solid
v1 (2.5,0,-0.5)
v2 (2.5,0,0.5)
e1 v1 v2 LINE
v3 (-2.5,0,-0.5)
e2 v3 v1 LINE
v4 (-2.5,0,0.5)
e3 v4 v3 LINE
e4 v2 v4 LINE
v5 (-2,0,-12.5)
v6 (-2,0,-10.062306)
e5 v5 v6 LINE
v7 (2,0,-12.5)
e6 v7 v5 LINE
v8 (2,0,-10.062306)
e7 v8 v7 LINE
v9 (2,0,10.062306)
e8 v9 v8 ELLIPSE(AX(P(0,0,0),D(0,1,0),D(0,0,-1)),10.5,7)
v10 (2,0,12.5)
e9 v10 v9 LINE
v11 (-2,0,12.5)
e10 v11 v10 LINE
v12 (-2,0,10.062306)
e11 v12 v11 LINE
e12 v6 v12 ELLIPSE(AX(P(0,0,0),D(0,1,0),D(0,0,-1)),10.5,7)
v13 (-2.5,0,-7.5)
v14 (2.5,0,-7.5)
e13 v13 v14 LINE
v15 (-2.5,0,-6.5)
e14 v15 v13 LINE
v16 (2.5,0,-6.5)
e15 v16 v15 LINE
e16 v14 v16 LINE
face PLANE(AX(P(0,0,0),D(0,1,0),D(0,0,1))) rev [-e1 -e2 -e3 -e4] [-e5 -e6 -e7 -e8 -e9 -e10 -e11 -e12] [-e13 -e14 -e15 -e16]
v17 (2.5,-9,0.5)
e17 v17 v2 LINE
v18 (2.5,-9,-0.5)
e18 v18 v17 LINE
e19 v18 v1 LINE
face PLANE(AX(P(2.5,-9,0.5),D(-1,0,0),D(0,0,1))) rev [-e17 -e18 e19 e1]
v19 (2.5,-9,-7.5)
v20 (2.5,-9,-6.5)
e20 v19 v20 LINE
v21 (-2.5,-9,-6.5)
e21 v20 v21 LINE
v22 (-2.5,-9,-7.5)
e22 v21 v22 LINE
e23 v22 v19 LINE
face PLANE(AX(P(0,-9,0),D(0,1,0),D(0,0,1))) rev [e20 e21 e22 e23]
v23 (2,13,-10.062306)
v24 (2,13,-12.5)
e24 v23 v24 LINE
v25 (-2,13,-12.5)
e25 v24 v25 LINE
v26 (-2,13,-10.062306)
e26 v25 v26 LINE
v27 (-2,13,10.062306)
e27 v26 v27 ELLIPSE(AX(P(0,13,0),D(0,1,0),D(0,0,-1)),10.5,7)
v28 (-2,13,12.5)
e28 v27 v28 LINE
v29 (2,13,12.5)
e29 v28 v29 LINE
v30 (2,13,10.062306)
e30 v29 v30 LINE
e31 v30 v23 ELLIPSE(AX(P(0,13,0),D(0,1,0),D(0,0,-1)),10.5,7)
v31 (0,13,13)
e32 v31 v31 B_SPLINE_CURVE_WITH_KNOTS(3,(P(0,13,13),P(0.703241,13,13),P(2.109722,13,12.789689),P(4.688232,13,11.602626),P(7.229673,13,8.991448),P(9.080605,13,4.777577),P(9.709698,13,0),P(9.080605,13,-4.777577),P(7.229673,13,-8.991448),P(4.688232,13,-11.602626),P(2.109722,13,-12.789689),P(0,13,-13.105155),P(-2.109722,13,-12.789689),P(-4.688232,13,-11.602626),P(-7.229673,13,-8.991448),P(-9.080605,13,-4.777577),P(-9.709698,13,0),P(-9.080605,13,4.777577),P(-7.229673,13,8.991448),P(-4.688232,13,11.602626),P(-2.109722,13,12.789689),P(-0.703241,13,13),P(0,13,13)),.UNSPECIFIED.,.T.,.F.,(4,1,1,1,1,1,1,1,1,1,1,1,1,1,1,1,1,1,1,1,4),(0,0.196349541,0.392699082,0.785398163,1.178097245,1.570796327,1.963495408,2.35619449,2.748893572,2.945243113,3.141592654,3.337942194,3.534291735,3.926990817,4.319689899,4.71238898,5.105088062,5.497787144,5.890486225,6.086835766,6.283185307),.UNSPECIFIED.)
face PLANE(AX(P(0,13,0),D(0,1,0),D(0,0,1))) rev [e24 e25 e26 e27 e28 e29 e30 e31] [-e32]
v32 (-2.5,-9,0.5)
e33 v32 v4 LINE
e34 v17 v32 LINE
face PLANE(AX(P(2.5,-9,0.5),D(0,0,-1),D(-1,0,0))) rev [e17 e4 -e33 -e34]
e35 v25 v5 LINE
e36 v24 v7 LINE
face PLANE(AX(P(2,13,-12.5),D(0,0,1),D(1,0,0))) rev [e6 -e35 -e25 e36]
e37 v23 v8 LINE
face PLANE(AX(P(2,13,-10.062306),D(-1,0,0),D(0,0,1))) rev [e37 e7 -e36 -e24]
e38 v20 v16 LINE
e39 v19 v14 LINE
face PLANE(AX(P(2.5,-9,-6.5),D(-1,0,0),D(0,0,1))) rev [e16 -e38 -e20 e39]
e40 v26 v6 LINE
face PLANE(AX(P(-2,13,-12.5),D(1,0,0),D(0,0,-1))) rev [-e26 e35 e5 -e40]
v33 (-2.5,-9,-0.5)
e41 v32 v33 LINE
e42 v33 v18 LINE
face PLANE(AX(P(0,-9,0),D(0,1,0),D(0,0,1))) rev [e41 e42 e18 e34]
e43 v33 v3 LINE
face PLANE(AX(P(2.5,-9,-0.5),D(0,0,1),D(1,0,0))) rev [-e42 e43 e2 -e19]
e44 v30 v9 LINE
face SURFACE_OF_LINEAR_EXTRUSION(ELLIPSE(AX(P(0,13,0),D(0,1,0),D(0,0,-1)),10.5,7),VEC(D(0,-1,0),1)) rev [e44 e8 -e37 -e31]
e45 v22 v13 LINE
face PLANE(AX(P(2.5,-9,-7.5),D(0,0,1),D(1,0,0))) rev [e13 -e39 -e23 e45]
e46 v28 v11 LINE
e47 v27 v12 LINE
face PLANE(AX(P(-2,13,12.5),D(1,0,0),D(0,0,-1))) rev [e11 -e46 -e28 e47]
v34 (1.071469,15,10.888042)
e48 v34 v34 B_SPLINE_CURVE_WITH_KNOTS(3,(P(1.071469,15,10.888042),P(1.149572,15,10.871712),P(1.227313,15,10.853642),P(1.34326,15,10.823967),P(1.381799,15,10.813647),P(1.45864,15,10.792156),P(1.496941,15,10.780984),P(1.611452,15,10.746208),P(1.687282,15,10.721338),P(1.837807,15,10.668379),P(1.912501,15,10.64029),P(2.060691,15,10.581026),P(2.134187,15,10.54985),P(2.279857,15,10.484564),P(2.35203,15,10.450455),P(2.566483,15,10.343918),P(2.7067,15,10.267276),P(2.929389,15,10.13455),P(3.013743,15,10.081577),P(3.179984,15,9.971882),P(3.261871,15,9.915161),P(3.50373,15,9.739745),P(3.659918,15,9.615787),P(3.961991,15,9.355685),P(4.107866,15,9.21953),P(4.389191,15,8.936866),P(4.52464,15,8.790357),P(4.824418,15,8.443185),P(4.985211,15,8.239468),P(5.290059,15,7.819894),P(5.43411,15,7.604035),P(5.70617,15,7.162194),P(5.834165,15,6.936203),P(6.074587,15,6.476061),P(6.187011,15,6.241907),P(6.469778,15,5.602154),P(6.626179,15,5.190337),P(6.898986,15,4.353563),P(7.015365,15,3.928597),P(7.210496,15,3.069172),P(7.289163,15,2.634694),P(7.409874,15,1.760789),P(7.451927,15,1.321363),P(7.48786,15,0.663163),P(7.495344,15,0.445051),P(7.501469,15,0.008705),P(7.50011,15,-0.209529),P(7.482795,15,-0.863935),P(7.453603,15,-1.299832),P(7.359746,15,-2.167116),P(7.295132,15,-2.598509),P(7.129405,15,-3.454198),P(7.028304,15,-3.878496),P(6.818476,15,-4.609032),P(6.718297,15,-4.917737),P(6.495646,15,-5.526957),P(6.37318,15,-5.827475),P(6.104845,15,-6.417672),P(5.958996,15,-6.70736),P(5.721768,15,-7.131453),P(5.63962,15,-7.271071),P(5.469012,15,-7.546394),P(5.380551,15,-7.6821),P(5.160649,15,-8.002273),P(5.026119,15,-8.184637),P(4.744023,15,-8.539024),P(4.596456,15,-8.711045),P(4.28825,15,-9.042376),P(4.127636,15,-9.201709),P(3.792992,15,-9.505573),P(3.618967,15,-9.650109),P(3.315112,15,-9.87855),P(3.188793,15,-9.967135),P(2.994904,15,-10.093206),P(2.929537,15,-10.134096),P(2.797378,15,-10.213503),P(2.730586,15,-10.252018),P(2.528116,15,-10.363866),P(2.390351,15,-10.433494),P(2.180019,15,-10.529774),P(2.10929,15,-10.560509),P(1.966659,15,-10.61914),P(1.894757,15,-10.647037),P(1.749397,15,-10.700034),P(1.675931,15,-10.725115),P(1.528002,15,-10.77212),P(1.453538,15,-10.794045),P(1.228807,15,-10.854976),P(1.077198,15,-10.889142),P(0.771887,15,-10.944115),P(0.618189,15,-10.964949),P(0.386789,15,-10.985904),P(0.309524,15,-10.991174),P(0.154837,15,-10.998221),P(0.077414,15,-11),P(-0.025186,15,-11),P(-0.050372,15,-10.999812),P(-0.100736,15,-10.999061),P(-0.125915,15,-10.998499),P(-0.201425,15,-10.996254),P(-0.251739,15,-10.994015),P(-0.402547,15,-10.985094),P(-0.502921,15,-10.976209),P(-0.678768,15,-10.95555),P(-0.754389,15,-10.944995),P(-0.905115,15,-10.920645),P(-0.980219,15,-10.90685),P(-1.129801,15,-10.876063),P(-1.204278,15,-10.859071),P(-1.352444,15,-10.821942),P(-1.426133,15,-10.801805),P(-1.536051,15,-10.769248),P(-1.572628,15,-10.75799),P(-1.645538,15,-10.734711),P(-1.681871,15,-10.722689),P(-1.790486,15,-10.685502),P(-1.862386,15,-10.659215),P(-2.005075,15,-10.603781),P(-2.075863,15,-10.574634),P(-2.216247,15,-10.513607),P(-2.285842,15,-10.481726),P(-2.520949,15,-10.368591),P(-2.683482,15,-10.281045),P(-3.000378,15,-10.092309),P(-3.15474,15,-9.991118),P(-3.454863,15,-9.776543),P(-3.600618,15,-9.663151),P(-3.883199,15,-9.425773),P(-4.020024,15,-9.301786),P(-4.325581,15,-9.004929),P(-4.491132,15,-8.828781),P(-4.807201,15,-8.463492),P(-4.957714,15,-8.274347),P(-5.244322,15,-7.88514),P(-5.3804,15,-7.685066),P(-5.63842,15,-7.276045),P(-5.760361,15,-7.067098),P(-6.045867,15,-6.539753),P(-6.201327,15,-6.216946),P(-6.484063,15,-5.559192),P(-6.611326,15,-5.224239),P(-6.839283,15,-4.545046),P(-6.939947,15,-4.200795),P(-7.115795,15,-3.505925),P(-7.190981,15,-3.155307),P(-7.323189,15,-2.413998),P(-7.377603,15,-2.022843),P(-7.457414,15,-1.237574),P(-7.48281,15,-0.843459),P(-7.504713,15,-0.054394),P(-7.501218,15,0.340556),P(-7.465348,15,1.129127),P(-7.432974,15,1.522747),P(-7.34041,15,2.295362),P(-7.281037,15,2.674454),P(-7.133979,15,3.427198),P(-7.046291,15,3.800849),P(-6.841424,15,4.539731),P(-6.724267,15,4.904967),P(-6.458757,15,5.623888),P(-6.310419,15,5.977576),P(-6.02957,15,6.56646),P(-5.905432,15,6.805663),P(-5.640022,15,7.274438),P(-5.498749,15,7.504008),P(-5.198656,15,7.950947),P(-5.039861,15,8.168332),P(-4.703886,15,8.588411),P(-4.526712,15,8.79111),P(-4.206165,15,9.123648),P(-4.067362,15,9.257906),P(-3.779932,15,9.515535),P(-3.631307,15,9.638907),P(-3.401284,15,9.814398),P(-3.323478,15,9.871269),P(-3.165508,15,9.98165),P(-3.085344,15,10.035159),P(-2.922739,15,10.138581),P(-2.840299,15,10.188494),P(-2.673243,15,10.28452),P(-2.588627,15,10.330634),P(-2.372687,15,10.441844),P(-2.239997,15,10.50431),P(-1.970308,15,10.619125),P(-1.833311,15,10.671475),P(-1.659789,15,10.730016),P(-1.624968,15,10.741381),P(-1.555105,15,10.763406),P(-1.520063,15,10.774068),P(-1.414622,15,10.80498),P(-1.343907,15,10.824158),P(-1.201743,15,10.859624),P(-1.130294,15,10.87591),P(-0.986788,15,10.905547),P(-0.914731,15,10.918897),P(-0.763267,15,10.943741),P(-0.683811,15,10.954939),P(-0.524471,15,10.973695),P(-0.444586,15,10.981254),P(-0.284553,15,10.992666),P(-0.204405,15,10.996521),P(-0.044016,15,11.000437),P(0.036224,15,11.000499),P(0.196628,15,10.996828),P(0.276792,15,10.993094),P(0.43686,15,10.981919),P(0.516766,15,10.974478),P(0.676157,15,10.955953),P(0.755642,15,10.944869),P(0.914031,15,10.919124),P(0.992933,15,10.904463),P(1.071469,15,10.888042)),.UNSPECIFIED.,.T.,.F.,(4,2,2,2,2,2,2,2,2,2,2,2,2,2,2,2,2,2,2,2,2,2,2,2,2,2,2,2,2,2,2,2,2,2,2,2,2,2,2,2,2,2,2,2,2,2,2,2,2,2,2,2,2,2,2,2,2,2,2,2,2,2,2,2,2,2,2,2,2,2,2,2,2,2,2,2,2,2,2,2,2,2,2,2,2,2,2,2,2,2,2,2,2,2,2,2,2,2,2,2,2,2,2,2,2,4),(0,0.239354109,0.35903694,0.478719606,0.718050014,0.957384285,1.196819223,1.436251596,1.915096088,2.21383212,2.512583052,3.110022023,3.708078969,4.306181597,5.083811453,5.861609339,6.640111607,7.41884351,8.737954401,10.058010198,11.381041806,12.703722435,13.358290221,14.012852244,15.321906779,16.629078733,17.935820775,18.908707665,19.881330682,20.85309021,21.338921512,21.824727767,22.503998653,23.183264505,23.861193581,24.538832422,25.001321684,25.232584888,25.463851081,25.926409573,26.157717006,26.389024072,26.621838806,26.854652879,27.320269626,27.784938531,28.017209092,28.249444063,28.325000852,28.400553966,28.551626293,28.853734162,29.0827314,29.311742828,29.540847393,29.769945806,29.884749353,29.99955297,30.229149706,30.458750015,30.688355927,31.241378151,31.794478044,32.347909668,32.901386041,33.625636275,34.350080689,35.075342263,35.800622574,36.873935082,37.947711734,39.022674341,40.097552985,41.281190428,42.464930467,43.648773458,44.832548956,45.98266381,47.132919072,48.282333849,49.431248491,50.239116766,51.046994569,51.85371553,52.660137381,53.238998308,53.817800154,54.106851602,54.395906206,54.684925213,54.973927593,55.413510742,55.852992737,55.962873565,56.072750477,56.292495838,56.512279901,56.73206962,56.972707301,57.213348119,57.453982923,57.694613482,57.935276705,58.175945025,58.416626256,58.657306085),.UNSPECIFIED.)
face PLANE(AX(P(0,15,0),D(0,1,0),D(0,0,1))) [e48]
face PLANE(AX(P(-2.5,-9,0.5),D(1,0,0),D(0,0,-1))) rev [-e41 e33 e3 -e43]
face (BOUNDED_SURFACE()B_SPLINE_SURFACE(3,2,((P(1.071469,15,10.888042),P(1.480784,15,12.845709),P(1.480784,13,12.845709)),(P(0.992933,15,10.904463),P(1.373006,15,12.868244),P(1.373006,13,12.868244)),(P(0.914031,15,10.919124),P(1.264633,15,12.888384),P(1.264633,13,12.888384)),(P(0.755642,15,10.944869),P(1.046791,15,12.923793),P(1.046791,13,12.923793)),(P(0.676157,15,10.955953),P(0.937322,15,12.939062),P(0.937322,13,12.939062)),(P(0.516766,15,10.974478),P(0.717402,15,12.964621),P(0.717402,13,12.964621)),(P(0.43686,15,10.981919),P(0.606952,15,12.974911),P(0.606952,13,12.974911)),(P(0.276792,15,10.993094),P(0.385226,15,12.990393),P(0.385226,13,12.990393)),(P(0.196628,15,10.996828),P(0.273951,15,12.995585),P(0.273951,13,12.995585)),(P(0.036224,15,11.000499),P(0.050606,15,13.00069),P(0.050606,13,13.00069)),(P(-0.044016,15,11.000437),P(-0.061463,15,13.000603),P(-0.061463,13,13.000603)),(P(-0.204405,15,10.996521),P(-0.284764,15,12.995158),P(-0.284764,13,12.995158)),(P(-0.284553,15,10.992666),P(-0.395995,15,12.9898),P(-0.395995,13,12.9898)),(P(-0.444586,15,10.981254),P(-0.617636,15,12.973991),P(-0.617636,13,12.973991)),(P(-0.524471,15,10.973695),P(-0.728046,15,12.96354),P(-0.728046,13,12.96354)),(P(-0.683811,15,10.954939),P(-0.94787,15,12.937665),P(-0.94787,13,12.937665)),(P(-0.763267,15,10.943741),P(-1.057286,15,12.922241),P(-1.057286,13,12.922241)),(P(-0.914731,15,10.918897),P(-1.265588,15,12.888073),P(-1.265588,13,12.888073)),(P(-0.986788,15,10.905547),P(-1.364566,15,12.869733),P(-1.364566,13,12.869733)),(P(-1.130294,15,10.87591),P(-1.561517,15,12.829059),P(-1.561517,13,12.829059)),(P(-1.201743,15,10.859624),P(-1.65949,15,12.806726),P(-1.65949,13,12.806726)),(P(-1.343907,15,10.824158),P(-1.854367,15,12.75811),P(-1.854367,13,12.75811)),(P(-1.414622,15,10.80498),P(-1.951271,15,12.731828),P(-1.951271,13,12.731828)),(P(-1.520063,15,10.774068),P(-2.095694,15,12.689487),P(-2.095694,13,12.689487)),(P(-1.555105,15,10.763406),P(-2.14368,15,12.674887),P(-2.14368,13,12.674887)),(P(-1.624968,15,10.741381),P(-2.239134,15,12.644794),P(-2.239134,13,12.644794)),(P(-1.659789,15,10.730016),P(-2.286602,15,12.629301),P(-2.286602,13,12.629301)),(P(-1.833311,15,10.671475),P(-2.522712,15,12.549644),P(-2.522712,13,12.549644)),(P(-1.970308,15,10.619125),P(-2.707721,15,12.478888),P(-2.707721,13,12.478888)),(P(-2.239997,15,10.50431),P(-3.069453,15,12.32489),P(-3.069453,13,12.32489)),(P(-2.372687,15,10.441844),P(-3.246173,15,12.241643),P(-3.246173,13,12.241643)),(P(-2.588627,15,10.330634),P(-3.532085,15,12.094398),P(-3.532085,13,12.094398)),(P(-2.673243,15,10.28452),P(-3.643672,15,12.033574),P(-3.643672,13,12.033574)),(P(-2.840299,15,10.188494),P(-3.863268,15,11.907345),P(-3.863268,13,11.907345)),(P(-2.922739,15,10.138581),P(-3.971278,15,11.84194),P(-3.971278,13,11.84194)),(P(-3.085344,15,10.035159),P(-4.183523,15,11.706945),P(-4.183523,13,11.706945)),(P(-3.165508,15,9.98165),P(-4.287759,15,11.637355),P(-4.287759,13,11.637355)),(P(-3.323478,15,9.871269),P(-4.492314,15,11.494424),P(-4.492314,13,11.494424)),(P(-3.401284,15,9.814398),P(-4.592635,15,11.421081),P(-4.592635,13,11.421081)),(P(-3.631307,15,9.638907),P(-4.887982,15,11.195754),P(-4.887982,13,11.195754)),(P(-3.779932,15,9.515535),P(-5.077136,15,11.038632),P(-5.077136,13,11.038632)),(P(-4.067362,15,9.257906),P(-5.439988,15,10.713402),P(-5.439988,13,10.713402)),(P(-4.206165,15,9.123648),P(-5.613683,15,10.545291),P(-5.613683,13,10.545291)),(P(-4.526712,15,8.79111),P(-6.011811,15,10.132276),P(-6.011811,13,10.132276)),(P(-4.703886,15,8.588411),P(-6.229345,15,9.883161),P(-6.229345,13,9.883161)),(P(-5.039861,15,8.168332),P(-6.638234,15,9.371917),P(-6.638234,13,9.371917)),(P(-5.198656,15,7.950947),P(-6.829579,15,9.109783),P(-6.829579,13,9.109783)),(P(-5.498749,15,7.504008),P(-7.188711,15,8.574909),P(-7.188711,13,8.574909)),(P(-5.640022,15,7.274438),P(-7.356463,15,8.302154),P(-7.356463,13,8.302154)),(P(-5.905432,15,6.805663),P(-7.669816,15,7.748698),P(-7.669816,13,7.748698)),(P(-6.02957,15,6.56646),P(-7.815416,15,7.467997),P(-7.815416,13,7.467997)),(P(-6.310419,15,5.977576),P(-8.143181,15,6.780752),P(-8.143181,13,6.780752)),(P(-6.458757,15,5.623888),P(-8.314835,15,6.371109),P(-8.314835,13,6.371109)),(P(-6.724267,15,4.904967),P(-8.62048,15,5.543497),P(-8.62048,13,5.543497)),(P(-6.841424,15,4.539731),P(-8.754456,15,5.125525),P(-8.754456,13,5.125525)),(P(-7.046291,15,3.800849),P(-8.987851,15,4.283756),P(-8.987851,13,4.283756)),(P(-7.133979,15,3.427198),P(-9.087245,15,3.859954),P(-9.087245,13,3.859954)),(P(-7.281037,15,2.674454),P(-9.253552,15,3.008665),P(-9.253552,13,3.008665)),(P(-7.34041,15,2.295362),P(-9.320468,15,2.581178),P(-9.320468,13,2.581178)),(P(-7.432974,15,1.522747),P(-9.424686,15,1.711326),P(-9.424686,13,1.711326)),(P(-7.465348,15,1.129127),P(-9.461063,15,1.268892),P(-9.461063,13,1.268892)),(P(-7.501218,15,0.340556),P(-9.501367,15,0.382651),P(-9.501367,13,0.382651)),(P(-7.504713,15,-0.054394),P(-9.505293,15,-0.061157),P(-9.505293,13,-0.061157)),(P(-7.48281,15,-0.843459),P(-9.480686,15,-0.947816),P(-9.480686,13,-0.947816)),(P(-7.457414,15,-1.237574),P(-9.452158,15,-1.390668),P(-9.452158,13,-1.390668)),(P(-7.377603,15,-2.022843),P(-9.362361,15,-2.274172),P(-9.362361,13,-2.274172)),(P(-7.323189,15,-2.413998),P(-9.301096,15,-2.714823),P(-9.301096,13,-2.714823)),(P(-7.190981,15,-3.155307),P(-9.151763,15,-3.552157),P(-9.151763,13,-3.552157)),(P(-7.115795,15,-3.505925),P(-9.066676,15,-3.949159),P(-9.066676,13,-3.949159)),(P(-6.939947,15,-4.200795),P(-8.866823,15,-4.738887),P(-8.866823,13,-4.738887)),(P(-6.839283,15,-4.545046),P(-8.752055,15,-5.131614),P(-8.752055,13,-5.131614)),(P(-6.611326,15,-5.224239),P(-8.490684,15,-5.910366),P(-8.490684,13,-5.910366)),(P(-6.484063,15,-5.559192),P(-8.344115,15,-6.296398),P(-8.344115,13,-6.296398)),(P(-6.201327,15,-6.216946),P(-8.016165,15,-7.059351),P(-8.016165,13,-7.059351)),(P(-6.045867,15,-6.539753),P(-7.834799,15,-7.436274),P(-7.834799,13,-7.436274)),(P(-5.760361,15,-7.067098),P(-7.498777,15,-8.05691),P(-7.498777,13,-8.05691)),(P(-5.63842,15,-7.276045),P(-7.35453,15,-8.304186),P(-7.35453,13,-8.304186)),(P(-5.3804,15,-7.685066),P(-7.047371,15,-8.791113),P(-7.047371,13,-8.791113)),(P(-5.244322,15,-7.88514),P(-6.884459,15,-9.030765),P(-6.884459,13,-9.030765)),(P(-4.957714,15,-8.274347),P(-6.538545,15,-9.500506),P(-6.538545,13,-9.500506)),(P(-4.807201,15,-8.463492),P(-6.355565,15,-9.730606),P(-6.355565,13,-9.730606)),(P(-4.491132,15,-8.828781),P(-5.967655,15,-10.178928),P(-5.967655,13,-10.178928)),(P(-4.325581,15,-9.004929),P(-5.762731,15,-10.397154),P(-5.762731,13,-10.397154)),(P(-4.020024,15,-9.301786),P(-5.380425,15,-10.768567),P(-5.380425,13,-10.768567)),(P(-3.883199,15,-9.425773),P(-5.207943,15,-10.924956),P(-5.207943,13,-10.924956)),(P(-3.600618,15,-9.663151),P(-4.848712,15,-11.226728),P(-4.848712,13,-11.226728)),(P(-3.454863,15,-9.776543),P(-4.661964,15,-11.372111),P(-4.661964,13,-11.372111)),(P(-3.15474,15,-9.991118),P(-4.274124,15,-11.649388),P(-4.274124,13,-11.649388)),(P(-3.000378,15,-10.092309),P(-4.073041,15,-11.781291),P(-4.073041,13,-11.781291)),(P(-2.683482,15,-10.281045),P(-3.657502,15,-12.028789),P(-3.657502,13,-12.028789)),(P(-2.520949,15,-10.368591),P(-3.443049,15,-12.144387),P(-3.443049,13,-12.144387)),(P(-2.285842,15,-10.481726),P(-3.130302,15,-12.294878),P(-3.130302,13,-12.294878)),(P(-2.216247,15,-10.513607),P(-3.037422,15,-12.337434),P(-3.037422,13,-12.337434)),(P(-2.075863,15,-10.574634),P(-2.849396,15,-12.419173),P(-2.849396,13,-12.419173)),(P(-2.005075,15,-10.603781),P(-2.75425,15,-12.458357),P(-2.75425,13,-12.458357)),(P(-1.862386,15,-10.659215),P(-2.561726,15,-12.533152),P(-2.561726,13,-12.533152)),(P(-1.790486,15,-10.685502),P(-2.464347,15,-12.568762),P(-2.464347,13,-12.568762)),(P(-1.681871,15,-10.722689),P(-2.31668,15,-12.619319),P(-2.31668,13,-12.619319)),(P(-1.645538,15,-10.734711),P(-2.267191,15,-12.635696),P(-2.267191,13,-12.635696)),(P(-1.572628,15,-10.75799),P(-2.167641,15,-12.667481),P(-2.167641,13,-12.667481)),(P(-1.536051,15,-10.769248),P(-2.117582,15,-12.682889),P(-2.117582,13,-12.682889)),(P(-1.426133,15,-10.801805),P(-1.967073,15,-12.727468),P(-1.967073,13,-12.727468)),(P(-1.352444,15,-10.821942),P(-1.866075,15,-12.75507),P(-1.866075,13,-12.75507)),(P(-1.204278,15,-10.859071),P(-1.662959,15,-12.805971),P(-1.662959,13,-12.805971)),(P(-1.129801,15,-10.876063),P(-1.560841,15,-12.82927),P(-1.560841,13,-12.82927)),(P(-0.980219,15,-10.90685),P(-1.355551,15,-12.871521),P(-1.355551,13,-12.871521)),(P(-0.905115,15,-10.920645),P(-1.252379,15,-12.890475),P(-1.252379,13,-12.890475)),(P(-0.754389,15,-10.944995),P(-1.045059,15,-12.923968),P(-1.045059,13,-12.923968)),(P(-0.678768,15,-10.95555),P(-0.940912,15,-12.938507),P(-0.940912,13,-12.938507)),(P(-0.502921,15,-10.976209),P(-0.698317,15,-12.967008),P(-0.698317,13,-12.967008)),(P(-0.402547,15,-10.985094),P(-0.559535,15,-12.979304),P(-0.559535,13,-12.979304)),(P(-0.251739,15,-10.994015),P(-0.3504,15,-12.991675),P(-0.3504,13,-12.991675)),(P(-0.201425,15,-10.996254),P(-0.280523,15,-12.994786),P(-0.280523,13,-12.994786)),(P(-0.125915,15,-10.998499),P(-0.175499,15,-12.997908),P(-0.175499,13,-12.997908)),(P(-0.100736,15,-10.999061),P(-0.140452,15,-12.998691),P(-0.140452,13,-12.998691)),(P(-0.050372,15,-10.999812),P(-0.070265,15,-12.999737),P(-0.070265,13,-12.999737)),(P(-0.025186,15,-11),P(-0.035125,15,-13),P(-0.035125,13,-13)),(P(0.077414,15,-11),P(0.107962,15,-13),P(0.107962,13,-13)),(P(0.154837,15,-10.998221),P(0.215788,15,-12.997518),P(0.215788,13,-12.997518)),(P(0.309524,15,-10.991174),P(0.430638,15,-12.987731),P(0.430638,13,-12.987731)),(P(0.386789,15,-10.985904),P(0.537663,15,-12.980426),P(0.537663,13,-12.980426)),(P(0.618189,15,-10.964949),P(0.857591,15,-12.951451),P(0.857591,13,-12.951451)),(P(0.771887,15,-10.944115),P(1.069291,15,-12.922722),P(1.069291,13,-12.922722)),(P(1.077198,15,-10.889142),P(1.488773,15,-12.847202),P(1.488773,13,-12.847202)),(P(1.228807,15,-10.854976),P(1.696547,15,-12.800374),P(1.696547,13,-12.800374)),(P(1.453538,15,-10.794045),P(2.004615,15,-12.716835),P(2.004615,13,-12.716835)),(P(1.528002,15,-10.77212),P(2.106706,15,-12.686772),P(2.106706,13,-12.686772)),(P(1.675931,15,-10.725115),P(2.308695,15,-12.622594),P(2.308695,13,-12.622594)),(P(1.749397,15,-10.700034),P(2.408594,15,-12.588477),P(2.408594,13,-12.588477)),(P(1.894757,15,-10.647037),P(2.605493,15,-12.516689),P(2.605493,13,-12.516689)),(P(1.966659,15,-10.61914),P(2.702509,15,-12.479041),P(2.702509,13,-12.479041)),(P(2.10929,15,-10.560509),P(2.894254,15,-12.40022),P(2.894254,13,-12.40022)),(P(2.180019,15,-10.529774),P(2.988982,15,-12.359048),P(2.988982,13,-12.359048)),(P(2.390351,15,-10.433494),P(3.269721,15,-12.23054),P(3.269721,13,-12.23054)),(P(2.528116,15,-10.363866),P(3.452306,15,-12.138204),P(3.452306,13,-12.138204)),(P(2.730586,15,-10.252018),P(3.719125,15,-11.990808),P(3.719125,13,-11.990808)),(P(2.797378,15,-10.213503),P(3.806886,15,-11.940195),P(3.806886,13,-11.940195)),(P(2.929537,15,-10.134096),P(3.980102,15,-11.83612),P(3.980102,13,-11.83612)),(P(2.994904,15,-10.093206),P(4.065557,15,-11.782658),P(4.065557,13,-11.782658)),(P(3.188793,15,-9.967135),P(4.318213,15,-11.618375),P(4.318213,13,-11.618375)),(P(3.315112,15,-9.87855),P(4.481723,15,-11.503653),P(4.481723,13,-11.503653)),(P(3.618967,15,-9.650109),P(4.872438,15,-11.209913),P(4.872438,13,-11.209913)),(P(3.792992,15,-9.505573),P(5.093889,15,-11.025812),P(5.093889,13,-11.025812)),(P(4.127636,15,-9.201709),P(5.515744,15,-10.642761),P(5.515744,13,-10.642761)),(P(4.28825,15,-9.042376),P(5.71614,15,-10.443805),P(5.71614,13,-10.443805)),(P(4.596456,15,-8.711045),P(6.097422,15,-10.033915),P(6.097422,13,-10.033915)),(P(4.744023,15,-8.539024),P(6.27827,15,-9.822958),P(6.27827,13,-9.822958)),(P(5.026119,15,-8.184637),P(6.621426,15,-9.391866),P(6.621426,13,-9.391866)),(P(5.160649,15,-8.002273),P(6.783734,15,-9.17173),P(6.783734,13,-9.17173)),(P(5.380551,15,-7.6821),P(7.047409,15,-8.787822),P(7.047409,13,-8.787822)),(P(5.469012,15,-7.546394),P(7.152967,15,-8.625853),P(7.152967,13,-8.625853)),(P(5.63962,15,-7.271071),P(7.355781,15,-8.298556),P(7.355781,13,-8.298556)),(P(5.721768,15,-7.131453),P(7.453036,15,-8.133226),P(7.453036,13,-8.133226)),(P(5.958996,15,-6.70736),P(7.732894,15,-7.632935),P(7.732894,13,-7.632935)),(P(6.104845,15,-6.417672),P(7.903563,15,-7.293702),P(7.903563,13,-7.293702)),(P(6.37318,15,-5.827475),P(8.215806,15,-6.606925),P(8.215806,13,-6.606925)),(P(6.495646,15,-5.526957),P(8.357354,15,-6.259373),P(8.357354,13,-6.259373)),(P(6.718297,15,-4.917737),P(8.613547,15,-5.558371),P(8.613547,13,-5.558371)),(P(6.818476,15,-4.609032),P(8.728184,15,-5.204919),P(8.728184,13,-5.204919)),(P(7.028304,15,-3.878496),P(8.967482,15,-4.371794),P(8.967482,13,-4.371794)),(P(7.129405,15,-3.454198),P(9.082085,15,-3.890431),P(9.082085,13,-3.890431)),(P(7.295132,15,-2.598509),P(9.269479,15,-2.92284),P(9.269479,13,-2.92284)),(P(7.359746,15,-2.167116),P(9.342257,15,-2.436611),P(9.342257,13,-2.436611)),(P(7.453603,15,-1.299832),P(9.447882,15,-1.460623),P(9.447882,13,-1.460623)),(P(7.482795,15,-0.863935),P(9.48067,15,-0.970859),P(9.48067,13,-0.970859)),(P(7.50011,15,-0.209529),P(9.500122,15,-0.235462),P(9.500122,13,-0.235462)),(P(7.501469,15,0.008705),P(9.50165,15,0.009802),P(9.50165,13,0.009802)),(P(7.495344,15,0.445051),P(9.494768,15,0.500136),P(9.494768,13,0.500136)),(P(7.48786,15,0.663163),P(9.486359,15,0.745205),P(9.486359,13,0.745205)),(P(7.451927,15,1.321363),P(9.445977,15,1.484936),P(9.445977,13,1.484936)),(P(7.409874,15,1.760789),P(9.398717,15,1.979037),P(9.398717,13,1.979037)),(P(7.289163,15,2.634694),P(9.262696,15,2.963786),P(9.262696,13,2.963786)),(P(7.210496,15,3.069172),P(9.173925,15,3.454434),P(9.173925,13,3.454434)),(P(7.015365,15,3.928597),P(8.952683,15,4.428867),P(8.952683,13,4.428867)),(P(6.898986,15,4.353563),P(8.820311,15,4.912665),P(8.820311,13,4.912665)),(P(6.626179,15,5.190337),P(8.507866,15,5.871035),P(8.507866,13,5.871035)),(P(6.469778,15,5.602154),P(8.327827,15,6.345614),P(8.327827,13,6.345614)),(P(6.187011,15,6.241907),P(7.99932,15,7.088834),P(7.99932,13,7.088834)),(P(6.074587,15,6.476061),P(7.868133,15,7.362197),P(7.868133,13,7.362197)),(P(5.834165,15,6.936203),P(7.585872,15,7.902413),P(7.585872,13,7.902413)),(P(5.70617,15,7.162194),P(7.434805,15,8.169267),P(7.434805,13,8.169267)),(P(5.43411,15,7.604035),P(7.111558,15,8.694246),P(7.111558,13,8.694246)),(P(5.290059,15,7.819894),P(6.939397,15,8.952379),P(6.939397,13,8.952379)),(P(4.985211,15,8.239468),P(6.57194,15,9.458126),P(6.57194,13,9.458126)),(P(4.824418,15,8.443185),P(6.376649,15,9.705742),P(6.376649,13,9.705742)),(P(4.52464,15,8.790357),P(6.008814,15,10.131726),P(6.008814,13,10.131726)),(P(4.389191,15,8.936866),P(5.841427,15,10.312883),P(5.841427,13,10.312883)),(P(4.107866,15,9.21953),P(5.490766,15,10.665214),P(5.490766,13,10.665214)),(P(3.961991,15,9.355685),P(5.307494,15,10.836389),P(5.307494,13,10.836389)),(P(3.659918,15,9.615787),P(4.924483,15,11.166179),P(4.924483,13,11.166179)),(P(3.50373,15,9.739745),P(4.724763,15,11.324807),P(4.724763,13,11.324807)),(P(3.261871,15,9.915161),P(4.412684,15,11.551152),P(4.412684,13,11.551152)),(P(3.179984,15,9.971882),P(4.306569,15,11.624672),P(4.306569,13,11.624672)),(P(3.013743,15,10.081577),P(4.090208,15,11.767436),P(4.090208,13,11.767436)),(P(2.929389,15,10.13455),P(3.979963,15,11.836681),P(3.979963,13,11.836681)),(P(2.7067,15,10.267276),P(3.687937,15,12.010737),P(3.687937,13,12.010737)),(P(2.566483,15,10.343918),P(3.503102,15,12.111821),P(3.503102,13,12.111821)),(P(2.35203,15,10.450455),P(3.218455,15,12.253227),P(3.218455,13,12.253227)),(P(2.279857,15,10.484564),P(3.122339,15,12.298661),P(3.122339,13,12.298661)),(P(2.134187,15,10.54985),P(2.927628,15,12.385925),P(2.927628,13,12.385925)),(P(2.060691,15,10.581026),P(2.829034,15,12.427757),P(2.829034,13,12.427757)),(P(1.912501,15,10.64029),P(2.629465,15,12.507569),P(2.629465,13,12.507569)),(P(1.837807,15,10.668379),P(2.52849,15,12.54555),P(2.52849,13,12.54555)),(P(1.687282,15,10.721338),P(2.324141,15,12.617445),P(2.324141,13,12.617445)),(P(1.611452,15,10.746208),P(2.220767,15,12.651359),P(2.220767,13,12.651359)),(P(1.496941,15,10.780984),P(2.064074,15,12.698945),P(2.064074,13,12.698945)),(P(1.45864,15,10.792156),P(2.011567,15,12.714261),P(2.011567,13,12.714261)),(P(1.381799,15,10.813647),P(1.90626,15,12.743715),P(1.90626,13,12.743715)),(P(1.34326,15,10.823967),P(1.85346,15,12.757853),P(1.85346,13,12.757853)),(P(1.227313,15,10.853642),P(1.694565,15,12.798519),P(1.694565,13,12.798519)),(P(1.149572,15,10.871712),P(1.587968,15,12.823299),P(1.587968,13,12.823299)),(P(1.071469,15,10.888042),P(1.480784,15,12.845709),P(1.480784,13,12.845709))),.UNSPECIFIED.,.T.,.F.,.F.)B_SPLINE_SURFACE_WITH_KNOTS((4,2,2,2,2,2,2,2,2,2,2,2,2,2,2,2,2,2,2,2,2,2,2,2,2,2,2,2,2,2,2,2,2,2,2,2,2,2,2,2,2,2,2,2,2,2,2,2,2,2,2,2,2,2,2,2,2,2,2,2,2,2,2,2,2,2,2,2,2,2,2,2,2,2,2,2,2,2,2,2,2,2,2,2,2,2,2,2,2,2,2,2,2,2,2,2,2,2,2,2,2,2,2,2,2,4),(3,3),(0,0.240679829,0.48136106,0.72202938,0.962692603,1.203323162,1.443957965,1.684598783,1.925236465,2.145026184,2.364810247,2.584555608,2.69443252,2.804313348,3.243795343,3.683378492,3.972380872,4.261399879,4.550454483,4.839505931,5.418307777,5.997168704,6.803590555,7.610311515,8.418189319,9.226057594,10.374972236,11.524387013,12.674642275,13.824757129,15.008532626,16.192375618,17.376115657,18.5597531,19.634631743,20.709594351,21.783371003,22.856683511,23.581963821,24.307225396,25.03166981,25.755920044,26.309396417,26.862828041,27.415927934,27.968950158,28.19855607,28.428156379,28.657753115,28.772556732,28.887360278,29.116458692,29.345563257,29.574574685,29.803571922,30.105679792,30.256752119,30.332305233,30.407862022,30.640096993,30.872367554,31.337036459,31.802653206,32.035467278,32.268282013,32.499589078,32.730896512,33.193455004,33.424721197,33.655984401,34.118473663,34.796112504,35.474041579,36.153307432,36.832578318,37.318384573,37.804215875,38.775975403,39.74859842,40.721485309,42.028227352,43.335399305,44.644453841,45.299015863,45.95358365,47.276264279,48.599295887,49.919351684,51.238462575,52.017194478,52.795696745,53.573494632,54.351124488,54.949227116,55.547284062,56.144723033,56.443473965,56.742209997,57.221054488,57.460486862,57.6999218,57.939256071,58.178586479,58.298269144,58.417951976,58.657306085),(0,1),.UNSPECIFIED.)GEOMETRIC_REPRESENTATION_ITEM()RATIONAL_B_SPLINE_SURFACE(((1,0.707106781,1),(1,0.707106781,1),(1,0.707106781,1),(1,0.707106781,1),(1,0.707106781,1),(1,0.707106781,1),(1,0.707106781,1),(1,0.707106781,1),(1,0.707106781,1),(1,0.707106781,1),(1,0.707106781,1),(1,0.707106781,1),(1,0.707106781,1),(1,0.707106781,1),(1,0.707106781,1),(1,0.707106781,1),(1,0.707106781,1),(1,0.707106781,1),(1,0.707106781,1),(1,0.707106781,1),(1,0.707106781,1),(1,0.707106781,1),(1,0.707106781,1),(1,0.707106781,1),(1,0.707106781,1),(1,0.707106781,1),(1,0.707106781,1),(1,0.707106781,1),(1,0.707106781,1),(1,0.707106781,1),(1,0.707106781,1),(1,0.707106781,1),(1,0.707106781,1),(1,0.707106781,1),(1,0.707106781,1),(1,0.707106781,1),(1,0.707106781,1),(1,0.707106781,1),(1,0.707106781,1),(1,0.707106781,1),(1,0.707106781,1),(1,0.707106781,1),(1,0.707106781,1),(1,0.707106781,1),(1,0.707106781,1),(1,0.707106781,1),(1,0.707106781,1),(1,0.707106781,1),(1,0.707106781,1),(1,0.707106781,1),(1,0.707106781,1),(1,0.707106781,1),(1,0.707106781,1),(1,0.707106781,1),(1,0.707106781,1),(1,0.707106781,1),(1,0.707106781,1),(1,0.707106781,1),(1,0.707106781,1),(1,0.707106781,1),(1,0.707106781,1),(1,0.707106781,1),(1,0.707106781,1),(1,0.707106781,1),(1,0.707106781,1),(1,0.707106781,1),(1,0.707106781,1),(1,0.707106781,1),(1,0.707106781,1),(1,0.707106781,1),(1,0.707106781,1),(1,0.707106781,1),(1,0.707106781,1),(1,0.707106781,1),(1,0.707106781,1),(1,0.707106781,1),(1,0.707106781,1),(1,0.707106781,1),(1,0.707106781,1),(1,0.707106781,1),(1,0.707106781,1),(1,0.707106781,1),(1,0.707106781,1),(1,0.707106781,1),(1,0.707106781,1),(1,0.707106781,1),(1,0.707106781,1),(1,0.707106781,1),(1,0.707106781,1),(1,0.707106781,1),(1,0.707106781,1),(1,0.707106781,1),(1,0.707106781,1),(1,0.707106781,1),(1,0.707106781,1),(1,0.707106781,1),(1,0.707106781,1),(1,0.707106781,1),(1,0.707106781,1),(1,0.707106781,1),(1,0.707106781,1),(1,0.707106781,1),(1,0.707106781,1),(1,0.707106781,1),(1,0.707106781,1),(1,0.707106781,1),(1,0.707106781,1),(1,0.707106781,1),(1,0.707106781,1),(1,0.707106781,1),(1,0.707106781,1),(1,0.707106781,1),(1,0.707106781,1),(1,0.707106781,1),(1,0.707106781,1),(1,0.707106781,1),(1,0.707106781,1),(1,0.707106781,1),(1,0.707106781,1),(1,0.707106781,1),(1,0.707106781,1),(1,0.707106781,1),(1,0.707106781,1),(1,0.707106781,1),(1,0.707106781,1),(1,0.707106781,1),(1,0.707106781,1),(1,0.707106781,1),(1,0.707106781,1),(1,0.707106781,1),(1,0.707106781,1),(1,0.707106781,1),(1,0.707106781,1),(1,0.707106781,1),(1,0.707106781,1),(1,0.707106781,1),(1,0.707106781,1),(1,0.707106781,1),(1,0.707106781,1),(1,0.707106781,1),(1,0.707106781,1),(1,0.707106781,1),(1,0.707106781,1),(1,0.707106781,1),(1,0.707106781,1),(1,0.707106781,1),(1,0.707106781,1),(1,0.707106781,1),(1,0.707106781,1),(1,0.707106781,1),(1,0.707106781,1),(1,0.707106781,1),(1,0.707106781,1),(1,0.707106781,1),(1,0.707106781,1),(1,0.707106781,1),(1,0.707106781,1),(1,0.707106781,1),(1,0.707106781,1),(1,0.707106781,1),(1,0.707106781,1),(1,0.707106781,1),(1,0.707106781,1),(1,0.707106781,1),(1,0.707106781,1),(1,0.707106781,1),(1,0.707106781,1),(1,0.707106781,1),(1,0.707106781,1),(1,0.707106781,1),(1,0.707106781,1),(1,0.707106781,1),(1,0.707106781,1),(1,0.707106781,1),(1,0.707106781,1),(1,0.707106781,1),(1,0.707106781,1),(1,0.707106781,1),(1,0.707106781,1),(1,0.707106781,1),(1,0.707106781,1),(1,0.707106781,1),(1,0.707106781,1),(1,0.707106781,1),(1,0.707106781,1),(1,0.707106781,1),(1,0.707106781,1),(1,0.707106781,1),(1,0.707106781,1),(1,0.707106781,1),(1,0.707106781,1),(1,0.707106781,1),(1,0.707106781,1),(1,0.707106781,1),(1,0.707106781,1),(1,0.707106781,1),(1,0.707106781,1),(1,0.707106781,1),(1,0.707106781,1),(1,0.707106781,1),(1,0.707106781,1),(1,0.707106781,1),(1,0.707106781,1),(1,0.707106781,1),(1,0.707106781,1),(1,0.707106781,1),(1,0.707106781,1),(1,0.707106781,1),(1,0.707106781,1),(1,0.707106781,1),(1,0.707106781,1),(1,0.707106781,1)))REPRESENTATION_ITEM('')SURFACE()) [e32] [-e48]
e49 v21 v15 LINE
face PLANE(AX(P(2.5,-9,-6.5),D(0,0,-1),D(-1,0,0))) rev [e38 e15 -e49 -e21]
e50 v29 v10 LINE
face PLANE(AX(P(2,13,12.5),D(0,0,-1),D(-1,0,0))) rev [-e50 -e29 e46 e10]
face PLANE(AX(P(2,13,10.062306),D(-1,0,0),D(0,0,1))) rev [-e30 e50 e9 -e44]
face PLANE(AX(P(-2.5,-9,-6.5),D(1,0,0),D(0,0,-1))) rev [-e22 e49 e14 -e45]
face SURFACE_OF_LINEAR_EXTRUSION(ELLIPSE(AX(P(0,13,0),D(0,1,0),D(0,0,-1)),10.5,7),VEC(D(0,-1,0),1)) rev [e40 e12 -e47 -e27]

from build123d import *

# Parameters (mm, degrees)
BOSS_EXTRU_1_DEPTH = 13
BOSS_EXTRU_2_DEPTH = 2
CONG_1_R           = 2
ESQUISSE3_W        = 5
ESQUISSE3_H        = 1
BOSS_EXTRU_3_DEPTH = 9


# Read off the part's stored shape, not the designer's step: Boss.-Extru.2
with BuildPart() as part:
    # Esquisse1 → Boss.-Extru.1 (new body)
    with BuildSketch(Plane(origin=(0, 0, 0), x_dir=(1, 0, 0), z_dir=(0, 1, 0))):
        with BuildLine():
            Line((2, 10.062305899), (2, 12.5))
            Line((2, 12.5), (-2, 12.5))
            Line((-2, 12.5), (-2, 10.062305899))
            add(Edge.make_bspline(
                [(-2, 10.062305899), (-24.5, 0), (-2, -10.062305899)],
                knots=[3.431344355, 3.431344355, 3.431344355, 5.993433606, 5.993433606, 5.993433606], degree=2, weights=[1, 0.285714286, 1]))
            Line((-2, -10.062305899), (-2, -12.5))
            Line((-2, -12.5), (2, -12.5))
            Line((2, -12.5), (2, -10.062305899))
            add(Edge.make_bspline(
                [(2, -10.062305899), (24.5, 0), (2, 10.062305899)],
                knots=[0.289751701, 0.289751701, 0.289751701, 2.851840952, 2.851840952, 2.851840952], degree=2, weights=[1, 0.285714286, 1]))
        make_face()
    extrude(amount=BOSS_EXTRU_1_DEPTH)

    # Boss.-Extru.2 outline → Boss.-Extru.2 (add)
    with BuildSketch(Plane(origin=(0, 13, 0), x_dir=(1, 0, 0), z_dir=(0, 1, 0))):
        with BuildLine():
            add(Edge.make_bspline(
                [(0, -13), (0.703240737, -13), (2.109722211, -12.789689498), (4.688231544, -11.602625859), (7.229672734, -8.991447827), (9.080604982, -4.777577384), (9.709697509, 0), (9.080604982, 4.777577384), (7.229672734, 8.991447827), (4.688231544, 11.602625859), (2.109722211, 12.789689498), (0, 13.105155251), (-2.109722211, 12.789689498), (-4.688231544, 11.602625859), (-7.229672734, 8.991447827), (-9.080604982, 4.777577384), (-9.709697509, 0), (-9.080604982, -4.777577384), (-7.229672734, -8.991447827), (-4.688231544, -11.602625859), (-2.109722211, -12.789689498), (-0.703240737, -13), (0, -13)],
                knots=[0, 0, 0, 0, 0.196349541, 0.392699082, 0.785398163, 1.178097245, 1.570796327, 1.963495408, 2.35619449, 2.748893572, 2.945243113, 3.141592654, 3.337942194, 3.534291735, 3.926990817, 4.319689899, 4.71238898, 5.105088062, 5.497787144, 5.890486225, 6.086835766, 6.283185307, 6.283185307, 6.283185307, 6.283185307], degree=3))
        make_face()
    extrude(amount=BOSS_EXTRU_2_DEPTH)

    # Congé1
    cong_1_edges = [part.edges().sort_by_distance(p)[0] for p in [
        (0, 15, -13),
    ]]
    fillet(cong_1_edges, radius=CONG_1_R - 0.0004)  # a hair under: the kernel refuses the full size

    # Esquisse3 → Boss.-Extru.3 (add)
    with BuildSketch(Plane.XZ):
        Rectangle(ESQUISSE3_W, ESQUISSE3_H)
        with Locations((0, -7)):
            Rectangle(ESQUISSE3_W, ESQUISSE3_H)
    extrude(amount=BOSS_EXTRU_3_DEPTH)


solid = part.part
